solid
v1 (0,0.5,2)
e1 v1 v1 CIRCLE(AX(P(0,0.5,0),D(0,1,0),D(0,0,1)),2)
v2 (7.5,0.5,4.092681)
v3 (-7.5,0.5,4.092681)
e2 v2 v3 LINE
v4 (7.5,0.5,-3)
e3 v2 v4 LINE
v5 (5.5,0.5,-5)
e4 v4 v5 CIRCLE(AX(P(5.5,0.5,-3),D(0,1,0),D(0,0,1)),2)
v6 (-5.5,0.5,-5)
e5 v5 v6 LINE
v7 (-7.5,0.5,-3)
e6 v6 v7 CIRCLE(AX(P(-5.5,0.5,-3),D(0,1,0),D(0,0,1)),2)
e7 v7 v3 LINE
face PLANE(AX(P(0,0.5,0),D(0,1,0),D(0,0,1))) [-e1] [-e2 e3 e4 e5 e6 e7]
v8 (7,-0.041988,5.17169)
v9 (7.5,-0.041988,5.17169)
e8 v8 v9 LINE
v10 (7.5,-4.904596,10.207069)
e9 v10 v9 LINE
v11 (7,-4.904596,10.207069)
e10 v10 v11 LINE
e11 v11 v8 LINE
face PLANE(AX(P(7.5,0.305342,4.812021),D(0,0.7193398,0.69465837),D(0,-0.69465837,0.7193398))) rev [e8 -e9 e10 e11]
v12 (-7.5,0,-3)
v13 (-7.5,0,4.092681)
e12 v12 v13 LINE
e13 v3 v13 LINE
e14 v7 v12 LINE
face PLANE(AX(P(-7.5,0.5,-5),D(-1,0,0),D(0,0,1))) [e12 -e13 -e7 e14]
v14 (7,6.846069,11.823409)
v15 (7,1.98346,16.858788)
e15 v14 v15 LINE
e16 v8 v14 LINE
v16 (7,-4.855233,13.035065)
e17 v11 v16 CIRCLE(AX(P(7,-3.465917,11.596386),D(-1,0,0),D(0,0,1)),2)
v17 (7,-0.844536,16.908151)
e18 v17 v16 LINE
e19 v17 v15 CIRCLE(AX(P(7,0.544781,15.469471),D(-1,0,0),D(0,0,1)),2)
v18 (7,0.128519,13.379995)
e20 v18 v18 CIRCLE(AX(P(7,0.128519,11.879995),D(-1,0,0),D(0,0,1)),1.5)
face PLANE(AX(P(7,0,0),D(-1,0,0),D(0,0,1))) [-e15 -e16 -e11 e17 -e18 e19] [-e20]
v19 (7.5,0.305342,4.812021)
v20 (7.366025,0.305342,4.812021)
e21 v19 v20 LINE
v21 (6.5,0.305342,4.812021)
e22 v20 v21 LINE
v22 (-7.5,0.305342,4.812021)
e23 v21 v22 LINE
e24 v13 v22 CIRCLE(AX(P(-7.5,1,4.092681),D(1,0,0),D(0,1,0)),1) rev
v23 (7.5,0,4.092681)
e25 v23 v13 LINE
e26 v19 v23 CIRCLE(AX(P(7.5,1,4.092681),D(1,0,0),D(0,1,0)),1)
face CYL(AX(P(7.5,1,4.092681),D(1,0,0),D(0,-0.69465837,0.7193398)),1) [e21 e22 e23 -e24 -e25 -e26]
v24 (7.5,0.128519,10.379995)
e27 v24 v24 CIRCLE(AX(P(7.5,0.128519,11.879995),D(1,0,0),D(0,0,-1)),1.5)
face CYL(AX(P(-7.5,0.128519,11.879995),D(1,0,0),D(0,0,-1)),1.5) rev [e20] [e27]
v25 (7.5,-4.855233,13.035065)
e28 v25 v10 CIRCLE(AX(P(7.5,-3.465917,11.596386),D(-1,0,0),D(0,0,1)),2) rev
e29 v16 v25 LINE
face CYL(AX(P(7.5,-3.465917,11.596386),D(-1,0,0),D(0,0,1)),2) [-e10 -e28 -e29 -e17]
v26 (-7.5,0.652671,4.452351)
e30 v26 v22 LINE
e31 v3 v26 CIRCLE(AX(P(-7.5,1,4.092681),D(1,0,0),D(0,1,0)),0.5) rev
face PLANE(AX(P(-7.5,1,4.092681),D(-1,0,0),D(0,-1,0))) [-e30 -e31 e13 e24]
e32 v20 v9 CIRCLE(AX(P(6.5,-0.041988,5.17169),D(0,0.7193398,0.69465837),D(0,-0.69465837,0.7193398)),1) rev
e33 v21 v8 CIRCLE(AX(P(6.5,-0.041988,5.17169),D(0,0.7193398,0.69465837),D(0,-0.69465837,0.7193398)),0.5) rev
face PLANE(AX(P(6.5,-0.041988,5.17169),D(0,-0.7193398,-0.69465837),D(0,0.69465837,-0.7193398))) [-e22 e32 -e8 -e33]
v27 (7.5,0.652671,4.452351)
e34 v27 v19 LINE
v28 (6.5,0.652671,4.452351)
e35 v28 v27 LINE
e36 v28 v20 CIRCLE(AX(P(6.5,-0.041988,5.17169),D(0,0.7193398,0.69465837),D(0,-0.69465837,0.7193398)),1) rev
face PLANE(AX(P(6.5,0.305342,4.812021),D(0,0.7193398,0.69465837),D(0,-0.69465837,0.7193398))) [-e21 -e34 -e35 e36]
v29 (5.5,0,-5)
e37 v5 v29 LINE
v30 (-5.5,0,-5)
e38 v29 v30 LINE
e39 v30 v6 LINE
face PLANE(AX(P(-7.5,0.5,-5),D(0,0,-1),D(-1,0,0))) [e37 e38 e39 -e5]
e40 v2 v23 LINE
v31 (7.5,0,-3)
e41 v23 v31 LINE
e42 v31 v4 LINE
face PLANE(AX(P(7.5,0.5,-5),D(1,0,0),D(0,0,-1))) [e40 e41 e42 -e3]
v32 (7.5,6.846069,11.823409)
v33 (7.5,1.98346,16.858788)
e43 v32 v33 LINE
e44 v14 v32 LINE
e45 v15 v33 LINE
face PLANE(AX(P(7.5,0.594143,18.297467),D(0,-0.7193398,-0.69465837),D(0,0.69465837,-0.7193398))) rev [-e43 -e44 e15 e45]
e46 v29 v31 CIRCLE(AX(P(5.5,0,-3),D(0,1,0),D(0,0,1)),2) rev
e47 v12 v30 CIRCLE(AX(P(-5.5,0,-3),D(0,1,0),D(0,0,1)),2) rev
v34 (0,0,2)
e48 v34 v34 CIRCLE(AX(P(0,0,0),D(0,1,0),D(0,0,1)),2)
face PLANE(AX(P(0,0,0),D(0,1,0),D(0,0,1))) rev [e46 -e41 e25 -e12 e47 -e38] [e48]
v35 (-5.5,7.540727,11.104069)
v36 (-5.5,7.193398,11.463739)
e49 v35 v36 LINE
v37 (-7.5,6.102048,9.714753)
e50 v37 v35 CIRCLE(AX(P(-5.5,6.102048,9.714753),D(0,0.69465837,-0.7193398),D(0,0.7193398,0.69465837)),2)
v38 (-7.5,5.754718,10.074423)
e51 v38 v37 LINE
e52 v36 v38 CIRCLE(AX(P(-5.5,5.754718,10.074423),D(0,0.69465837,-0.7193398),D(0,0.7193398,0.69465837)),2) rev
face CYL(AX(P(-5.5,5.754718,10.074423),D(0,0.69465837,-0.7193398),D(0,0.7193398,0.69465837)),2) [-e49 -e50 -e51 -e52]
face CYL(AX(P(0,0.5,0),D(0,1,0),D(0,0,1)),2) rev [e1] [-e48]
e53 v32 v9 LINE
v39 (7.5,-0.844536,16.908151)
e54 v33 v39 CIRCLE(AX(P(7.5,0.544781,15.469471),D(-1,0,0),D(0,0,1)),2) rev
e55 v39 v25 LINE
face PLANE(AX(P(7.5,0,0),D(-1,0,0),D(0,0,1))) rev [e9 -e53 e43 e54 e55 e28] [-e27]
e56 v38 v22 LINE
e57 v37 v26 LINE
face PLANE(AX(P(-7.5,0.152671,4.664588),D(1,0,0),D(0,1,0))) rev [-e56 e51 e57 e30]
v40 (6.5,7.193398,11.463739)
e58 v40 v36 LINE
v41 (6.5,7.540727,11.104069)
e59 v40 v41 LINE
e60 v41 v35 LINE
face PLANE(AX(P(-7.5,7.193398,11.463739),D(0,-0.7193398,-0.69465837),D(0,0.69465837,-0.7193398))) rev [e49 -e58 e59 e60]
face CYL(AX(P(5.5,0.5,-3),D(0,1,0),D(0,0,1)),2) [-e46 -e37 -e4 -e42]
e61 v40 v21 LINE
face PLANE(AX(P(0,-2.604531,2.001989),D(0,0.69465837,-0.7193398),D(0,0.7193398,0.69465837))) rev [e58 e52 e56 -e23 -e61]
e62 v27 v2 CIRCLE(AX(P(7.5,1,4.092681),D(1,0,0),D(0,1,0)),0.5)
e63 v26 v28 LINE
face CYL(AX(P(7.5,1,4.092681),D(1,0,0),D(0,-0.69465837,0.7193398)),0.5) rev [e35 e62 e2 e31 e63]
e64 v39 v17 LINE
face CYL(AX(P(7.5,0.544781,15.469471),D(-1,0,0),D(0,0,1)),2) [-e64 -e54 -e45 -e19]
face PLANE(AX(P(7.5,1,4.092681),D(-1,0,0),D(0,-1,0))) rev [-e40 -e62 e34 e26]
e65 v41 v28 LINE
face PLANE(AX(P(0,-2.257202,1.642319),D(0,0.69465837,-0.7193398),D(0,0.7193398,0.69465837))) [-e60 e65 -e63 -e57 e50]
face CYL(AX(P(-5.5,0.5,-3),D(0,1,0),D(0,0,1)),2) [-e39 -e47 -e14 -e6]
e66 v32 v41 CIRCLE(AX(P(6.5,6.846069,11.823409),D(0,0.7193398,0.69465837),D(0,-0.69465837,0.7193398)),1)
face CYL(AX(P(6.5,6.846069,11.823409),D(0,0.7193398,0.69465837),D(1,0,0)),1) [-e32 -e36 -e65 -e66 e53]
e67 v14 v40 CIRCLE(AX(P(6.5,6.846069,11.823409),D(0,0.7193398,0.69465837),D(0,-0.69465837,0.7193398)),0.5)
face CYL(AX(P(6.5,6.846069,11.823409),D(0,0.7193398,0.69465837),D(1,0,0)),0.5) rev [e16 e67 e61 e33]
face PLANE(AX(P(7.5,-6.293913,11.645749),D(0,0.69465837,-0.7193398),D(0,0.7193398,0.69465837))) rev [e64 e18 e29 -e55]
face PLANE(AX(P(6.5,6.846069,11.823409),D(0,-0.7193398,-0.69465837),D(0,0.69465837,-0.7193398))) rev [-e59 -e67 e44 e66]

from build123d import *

# Parameters (mm, degrees)
SKETCH_1_W                       = 15
SKETCH_1_H                       = 10
SKETCH_1_R                       = 2
EXTRUDE_1_DEPTH                  = 0.5
SM_START                         = -7.5
SM_EDGE_FLANGE_1_DEPTH           = 15
SM_EDGE_FLANGE_1_2_DEPTH         = 15
SM_EDGE_FLANGE_2_STRIP_W         = 3
SM_EDGE_FLANGE_2_STRIP_H         = 0.5
SM_EDGE_FLANGE_2_STRIP_CUT_DEPTH = 9.575525184
SM_EDGE_FLANGE_2_DEPTH           = 9.575525184
SKETCH_12_R                      = 1.5
CUT_EXTRUDE_1_DEPTH              = 25.832637406
FILLET_1_R                       = 2


# Read off the part's stored shape, not the designer's step: Ребро-кромка1
# Sheet-metal steps are written as plain solids
with BuildPart() as part:
    # Sketch 1 → Бобышка-Вытянуть1 (new body)
    with BuildSketch(Plane(origin=(0, 0, 0), x_dir=(1, 0, 0), z_dir=(0, 1, 0))):
        Rectangle(SKETCH_1_W, SKETCH_1_H)
        with Locations(Location((0, 0, 0), (0, 0, 270))):
            Circle(SKETCH_1_R, mode=Mode.SUBTRACT)
    extrude(amount=EXTRUDE_1_DEPTH)

    # Ребро-кромка1 outline → Ребро-кромка1 (cut)
    with BuildSketch(Plane.YZ.offset(SM_START)):
        with BuildLine():
            ThreePointArc((0, 4.092680796), (0.079495147, 4.483411925), (0.30534163, 4.812020597))
            Line((0.30534163, 4.812020597), (0.5, 5))
            Line((0.5, 5), (0, 5))
            Line((0, 5), (0, 4.092680796))
        make_face()
    extrude(amount=SM_EDGE_FLANGE_1_DEPTH, mode=Mode.SUBTRACT)

    # Sm Edge Flange 1 2 outline → Sm Edge Flange 1 2 (add)
    with BuildSketch(Plane.YZ.offset(SM_START)):
        with BuildLine():
            Line((7.193398003, 11.463739317), (0.5, 5))
            Line((0.5, 5), (0.5, 4.092680796))
            ThreePointArc((0.5, 4.092680796), (0.539747573, 4.288046361), (0.652670815, 4.452350697))
            Line((0.652670815, 4.452350697), (7.540727189, 11.104069417))
            Line((7.540727189, 11.104069417), (7.193398003, 11.463739317))
        make_face()
    extrude(amount=SM_EDGE_FLANGE_1_2_DEPTH)

    # Ребро-кромка2 strip (across the edge) → Ребро-кромка2 strip cut (cut)
    with BuildSketch(Plane(origin=(7.5, 0.30534163, 4.812020597), x_dir=(-1, 0, 0), z_dir=(0, 0.7193398003386473, 0.6946583704590013))):
        with Locations((-0.5, -0.25)):
            Rectangle(SM_EDGE_FLANGE_2_STRIP_W, SM_EDGE_FLANGE_2_STRIP_H)
    extrude(amount=SM_EDGE_FLANGE_2_STRIP_CUT_DEPTH, mode=Mode.SUBTRACT)

    # Ребро-кромка2 section (across the edge) → Ребро-кромка2 (add)
    with BuildSketch(Plane(origin=(7.5, 0.30534163, 4.812020597), x_dir=(-1, 0, 0), z_dir=(0, 0.7193398003386473, 0.6946583704590013))):
        with BuildLine():
            Line((0, 0.5), (0, 9.5))
            Line((0, 9.5), (0.5, 9.5))
            Line((0.5, 9.5), (0.5, 0.5))
            ThreePointArc((0.5, 0.5), (0.646446609, 0.146446609), (1, 0))
            Line((1, 0), (1, -0.5))
            ThreePointArc((1, -0.5), (0.292893219, -0.207106781), (0, 0.5))
        make_face()
    extrude(amount=SM_EDGE_FLANGE_2_DEPTH)

    # Эскиз12 → Вырез-Вытянуть1 (cut, through all)
    with BuildSketch(Plane(origin=(7.5, 0, 0), x_dir=(0, 0, -1), z_dir=(1, 0, 0))):
        with Locations((-11.879995076, 0.128518841)):
            Circle(SKETCH_12_R)
    extrude(amount=-CUT_EXTRUDE_1_DEPTH, mode=Mode.SUBTRACT)

    # Скругление1
    fillet_1_edges = [part.edges().sort_by_distance(p)[0] for p in [
        (7.25, -6.29391289, 11.6457487),
        (7.25, 0.594143484, 18.29746742),
        (-7.5, 7.367062596, 11.283904367),
        (7.5, 0.25, -5),
        (-7.5, 0.25, -5),
    ]]
    fillet(fillet_1_edges, radius=FILLET_1_R)


solid = part.part
